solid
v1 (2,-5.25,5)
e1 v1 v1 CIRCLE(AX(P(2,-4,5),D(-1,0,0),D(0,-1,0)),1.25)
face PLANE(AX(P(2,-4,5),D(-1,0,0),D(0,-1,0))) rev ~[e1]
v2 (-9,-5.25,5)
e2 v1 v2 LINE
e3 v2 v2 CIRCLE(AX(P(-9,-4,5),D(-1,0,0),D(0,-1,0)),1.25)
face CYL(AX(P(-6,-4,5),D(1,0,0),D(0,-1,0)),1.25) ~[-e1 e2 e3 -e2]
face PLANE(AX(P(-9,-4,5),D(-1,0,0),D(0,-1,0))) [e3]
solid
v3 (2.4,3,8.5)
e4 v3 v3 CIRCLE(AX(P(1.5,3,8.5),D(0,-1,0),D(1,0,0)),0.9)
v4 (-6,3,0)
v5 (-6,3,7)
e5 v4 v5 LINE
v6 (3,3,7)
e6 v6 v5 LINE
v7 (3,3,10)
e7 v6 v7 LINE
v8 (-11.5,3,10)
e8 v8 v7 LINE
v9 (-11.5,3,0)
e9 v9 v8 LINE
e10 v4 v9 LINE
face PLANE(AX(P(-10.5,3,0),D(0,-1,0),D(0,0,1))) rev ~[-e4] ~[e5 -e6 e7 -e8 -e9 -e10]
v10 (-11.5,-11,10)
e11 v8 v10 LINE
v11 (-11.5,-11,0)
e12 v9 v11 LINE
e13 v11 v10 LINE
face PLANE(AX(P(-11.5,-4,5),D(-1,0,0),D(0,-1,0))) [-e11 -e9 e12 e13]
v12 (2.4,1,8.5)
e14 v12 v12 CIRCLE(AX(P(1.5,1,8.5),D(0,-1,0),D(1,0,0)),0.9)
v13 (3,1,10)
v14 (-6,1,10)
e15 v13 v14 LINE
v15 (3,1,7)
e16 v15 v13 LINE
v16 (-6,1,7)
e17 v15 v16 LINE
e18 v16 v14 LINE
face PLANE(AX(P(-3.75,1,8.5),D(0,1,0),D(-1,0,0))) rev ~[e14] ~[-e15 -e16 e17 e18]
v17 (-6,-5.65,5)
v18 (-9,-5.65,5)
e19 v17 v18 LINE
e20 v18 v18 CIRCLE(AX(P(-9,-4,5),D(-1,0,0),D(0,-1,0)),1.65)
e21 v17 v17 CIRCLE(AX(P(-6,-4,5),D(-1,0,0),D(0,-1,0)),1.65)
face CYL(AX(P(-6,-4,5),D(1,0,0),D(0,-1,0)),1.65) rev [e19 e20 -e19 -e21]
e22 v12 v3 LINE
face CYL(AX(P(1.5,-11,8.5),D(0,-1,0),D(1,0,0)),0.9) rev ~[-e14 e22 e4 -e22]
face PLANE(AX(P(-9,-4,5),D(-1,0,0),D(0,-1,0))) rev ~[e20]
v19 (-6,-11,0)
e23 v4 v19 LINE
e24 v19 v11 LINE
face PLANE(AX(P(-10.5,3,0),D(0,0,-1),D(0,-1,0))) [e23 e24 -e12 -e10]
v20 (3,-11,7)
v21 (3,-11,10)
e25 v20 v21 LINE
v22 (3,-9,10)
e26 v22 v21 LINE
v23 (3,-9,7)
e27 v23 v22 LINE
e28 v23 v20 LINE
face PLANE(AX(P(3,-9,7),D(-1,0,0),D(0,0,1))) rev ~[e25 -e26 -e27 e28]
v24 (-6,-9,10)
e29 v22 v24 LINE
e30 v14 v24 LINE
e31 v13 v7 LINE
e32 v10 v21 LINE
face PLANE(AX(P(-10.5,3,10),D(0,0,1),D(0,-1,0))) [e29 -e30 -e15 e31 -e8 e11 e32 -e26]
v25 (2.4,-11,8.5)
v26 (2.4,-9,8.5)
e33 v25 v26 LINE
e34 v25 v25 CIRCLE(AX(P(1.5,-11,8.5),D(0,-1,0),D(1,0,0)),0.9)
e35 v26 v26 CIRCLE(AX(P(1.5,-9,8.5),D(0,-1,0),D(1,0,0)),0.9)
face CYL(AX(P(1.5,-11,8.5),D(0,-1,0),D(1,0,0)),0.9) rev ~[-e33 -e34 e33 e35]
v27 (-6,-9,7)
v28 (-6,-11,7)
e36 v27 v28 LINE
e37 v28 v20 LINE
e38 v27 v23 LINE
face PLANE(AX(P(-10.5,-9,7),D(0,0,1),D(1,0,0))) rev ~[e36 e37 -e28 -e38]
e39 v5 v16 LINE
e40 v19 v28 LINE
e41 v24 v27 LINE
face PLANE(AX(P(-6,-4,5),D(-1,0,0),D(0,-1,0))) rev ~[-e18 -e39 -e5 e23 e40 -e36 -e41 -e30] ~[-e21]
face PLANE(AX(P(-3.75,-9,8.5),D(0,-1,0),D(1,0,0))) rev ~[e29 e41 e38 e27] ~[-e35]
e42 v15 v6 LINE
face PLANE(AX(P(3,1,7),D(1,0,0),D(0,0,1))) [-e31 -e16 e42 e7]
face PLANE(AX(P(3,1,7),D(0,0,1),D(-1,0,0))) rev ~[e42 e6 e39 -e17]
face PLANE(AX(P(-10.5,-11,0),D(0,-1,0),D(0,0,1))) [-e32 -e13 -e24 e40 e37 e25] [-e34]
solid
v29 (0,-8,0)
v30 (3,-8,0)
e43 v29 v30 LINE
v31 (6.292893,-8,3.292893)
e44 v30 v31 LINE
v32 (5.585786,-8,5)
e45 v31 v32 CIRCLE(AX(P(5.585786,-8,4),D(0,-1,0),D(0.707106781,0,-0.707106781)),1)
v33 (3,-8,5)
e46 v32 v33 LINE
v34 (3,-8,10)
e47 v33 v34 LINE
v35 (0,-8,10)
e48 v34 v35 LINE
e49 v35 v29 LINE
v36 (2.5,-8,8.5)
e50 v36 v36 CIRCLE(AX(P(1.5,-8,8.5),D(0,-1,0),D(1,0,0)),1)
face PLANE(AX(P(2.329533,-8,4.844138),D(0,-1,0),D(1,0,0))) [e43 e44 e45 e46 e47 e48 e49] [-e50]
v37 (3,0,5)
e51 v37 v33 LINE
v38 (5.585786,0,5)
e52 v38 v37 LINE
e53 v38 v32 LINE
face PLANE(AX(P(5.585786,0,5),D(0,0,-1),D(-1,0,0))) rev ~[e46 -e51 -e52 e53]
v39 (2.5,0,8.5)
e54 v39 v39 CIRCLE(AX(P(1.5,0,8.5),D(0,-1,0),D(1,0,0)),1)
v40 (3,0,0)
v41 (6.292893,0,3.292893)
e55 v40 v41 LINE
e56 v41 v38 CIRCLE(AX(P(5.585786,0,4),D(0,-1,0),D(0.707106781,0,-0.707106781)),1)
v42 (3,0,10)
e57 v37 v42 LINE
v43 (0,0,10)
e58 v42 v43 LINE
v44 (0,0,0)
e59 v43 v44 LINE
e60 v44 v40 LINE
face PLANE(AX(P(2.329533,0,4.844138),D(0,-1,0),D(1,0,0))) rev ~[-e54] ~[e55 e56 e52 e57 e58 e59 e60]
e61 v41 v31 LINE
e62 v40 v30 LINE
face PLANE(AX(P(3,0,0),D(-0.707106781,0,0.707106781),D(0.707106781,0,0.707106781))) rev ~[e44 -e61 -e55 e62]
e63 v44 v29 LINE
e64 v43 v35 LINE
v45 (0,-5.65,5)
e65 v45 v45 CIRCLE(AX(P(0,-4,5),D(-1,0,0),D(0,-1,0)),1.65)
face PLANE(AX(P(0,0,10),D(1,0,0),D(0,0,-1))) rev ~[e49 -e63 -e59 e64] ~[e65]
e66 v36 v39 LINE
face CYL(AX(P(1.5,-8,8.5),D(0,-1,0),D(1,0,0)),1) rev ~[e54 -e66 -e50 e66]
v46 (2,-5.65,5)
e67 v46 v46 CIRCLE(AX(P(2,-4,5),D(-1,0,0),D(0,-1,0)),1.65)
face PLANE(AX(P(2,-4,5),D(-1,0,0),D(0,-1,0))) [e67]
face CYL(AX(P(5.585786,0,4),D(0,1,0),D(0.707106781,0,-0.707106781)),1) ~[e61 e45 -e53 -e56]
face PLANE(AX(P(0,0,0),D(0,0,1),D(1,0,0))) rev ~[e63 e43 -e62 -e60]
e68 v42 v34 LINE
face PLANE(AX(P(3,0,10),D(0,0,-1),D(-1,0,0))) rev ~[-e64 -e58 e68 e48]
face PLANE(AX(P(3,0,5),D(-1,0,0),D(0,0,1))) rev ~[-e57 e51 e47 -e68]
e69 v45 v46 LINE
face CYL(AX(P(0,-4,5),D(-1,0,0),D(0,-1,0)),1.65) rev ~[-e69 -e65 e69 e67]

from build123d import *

# Parameters (mm, degrees)
F1_DEPTH       = 8
F2_R           = 1
F3_DEPTH       = 8.001
F4_R           = 1.65
F5_DEPTH       = 2
F6_R           = 1.25
F7_DEPTH       = 8
F8_R           = 0.9
F9_DEPTH       = 1
F9_DEPTH_BACK  = 9
F11_DEPTH      = 2
F12_W          = 13.5
F12_H          = 3
F13_DEPTH      = 2
F14_W          = 14
F14_H          = 10
F15_DEPTH      = 1
F15_DEPTH_BACK = 4.5
F17_R          = 1.65
F18_DEPTH      = 3
F20_DEPTH      = 3
F21_R          = 0.9
F22_DEPTH      = 14.001


with BuildPart() as f1:
    # F0 (on Front) → F1 (new body)
    with BuildSketch(Plane.XZ):
        with BuildLine():
            Line((0, 10), (0, 0))
            Line((0, 0), (3, 0))
            Line((3, 0), (6.2928932188, 3.2928932188))
            ThreePointArc((6.2928932188, 3.2928932188), (6.5096659701, 4.3826834324), (5.5857864376, 5))
            Line((5.5857864376, 5), (3, 5))
            Line((3, 5), (3, 10))
            Line((3, 10), (0, 10))
        make_face()
    extrude(amount=F1_DEPTH)

    # F2 (on face) → F3 (cut, through all)
    with BuildSketch(Plane.XZ.offset(8)):
        with Locations((1.5, 8.5)):
            Circle(F2_R)
    extrude(amount=-F3_DEPTH, mode=Mode.SUBTRACT)

    # F4 (on face) → F5 (cut)
    with BuildSketch(Plane(origin=(0, 0, 0), x_dir=(0, -1, 0), z_dir=(-1, 0, 0))):
        with Locations((4, 5)):
            Circle(F4_R)
    extrude(amount=-F5_DEPTH, mode=Mode.SUBTRACT)


with BuildPart() as f7:
    # F6 (on face) → F7 (new body)
    with BuildSketch(Plane(origin=(2, 0, 0), x_dir=(0, -1, 0), z_dir=(-1, 0, 0))):
        with Locations((4, 5)):
            Circle(F6_R)
    extrude(amount=F7_DEPTH)

    # F20 (add): a face of the model
    f20_faces = [f7.faces().sort_by_distance(p)[0] for p in [
        (-6, -4, 5),
    ]]
    extrude(f20_faces, amount=F20_DEPTH)


with BuildPart() as f9:
    # F8 (on face) → F9 (new body, two sides)
    with BuildSketch(Plane(origin=(0, 0, 0), x_dir=(-1, 0, 0), z_dir=(0, 1, 0))) as f9_sk:
        with Locations((-1.5, 8.5)):
            Circle(F8_R)
    extrude(amount=F9_DEPTH)
    extrude(f9_sk.sketch, amount=-F9_DEPTH_BACK)

    # F10 (on face) → F11 (join)
    with BuildSketch(Plane.XZ.offset(9)):
        Polygon((3, 10), (1.5, 10), (-10.5, 10), (-10.5, 7), (3, 7), align=None)
    extrude(amount=F11_DEPTH)

    # F12 (on face) → F13 (join)
    with BuildSketch(Plane(origin=(0, 1, 0), x_dir=(-1, 0, 0), z_dir=(0, 1, 0))):
        with Locations((3.75, 8.5)):
            Rectangle(F12_W, F12_H)
    extrude(amount=F13_DEPTH)

    # F14 (on face) → F15 (join, two sides)
    with BuildSketch(Plane(origin=(-10.5, 0, 0), x_dir=(0, -1, 0), z_dir=(-1, 0, 0))) as f15_sk:
        with Locations((4, 5)):
            Rectangle(F14_W, F14_H)
    extrude(amount=F15_DEPTH)
    extrude(f15_sk.sketch, amount=-F15_DEPTH_BACK)

    # F16: union 


with BuildPart() as f18:
    # F17 (on face) → F18 (new body)
    with BuildSketch(Plane(origin=(-6, 0, 0), x_dir=(0, -1, 0), z_dir=(-1, 0, 0))):
        with Locations((4, 5)):
            Circle(F17_R)
    extrude(amount=F18_DEPTH)


with BuildPart() as f9_1:
    add(f9.part)

    # F19: cut F18
    add(f18.part, mode=Mode.SUBTRACT)

    # F21 (on face) → F22 (cut, through all)
    with BuildSketch(Plane.XZ.offset(11)):
        with Locations((1.5, 8.5)):
            Circle(F21_R)
    extrude(amount=-F22_DEPTH, mode=Mode.SUBTRACT)


solid = Compound([f1.part, f7.part, f9_1.part])
